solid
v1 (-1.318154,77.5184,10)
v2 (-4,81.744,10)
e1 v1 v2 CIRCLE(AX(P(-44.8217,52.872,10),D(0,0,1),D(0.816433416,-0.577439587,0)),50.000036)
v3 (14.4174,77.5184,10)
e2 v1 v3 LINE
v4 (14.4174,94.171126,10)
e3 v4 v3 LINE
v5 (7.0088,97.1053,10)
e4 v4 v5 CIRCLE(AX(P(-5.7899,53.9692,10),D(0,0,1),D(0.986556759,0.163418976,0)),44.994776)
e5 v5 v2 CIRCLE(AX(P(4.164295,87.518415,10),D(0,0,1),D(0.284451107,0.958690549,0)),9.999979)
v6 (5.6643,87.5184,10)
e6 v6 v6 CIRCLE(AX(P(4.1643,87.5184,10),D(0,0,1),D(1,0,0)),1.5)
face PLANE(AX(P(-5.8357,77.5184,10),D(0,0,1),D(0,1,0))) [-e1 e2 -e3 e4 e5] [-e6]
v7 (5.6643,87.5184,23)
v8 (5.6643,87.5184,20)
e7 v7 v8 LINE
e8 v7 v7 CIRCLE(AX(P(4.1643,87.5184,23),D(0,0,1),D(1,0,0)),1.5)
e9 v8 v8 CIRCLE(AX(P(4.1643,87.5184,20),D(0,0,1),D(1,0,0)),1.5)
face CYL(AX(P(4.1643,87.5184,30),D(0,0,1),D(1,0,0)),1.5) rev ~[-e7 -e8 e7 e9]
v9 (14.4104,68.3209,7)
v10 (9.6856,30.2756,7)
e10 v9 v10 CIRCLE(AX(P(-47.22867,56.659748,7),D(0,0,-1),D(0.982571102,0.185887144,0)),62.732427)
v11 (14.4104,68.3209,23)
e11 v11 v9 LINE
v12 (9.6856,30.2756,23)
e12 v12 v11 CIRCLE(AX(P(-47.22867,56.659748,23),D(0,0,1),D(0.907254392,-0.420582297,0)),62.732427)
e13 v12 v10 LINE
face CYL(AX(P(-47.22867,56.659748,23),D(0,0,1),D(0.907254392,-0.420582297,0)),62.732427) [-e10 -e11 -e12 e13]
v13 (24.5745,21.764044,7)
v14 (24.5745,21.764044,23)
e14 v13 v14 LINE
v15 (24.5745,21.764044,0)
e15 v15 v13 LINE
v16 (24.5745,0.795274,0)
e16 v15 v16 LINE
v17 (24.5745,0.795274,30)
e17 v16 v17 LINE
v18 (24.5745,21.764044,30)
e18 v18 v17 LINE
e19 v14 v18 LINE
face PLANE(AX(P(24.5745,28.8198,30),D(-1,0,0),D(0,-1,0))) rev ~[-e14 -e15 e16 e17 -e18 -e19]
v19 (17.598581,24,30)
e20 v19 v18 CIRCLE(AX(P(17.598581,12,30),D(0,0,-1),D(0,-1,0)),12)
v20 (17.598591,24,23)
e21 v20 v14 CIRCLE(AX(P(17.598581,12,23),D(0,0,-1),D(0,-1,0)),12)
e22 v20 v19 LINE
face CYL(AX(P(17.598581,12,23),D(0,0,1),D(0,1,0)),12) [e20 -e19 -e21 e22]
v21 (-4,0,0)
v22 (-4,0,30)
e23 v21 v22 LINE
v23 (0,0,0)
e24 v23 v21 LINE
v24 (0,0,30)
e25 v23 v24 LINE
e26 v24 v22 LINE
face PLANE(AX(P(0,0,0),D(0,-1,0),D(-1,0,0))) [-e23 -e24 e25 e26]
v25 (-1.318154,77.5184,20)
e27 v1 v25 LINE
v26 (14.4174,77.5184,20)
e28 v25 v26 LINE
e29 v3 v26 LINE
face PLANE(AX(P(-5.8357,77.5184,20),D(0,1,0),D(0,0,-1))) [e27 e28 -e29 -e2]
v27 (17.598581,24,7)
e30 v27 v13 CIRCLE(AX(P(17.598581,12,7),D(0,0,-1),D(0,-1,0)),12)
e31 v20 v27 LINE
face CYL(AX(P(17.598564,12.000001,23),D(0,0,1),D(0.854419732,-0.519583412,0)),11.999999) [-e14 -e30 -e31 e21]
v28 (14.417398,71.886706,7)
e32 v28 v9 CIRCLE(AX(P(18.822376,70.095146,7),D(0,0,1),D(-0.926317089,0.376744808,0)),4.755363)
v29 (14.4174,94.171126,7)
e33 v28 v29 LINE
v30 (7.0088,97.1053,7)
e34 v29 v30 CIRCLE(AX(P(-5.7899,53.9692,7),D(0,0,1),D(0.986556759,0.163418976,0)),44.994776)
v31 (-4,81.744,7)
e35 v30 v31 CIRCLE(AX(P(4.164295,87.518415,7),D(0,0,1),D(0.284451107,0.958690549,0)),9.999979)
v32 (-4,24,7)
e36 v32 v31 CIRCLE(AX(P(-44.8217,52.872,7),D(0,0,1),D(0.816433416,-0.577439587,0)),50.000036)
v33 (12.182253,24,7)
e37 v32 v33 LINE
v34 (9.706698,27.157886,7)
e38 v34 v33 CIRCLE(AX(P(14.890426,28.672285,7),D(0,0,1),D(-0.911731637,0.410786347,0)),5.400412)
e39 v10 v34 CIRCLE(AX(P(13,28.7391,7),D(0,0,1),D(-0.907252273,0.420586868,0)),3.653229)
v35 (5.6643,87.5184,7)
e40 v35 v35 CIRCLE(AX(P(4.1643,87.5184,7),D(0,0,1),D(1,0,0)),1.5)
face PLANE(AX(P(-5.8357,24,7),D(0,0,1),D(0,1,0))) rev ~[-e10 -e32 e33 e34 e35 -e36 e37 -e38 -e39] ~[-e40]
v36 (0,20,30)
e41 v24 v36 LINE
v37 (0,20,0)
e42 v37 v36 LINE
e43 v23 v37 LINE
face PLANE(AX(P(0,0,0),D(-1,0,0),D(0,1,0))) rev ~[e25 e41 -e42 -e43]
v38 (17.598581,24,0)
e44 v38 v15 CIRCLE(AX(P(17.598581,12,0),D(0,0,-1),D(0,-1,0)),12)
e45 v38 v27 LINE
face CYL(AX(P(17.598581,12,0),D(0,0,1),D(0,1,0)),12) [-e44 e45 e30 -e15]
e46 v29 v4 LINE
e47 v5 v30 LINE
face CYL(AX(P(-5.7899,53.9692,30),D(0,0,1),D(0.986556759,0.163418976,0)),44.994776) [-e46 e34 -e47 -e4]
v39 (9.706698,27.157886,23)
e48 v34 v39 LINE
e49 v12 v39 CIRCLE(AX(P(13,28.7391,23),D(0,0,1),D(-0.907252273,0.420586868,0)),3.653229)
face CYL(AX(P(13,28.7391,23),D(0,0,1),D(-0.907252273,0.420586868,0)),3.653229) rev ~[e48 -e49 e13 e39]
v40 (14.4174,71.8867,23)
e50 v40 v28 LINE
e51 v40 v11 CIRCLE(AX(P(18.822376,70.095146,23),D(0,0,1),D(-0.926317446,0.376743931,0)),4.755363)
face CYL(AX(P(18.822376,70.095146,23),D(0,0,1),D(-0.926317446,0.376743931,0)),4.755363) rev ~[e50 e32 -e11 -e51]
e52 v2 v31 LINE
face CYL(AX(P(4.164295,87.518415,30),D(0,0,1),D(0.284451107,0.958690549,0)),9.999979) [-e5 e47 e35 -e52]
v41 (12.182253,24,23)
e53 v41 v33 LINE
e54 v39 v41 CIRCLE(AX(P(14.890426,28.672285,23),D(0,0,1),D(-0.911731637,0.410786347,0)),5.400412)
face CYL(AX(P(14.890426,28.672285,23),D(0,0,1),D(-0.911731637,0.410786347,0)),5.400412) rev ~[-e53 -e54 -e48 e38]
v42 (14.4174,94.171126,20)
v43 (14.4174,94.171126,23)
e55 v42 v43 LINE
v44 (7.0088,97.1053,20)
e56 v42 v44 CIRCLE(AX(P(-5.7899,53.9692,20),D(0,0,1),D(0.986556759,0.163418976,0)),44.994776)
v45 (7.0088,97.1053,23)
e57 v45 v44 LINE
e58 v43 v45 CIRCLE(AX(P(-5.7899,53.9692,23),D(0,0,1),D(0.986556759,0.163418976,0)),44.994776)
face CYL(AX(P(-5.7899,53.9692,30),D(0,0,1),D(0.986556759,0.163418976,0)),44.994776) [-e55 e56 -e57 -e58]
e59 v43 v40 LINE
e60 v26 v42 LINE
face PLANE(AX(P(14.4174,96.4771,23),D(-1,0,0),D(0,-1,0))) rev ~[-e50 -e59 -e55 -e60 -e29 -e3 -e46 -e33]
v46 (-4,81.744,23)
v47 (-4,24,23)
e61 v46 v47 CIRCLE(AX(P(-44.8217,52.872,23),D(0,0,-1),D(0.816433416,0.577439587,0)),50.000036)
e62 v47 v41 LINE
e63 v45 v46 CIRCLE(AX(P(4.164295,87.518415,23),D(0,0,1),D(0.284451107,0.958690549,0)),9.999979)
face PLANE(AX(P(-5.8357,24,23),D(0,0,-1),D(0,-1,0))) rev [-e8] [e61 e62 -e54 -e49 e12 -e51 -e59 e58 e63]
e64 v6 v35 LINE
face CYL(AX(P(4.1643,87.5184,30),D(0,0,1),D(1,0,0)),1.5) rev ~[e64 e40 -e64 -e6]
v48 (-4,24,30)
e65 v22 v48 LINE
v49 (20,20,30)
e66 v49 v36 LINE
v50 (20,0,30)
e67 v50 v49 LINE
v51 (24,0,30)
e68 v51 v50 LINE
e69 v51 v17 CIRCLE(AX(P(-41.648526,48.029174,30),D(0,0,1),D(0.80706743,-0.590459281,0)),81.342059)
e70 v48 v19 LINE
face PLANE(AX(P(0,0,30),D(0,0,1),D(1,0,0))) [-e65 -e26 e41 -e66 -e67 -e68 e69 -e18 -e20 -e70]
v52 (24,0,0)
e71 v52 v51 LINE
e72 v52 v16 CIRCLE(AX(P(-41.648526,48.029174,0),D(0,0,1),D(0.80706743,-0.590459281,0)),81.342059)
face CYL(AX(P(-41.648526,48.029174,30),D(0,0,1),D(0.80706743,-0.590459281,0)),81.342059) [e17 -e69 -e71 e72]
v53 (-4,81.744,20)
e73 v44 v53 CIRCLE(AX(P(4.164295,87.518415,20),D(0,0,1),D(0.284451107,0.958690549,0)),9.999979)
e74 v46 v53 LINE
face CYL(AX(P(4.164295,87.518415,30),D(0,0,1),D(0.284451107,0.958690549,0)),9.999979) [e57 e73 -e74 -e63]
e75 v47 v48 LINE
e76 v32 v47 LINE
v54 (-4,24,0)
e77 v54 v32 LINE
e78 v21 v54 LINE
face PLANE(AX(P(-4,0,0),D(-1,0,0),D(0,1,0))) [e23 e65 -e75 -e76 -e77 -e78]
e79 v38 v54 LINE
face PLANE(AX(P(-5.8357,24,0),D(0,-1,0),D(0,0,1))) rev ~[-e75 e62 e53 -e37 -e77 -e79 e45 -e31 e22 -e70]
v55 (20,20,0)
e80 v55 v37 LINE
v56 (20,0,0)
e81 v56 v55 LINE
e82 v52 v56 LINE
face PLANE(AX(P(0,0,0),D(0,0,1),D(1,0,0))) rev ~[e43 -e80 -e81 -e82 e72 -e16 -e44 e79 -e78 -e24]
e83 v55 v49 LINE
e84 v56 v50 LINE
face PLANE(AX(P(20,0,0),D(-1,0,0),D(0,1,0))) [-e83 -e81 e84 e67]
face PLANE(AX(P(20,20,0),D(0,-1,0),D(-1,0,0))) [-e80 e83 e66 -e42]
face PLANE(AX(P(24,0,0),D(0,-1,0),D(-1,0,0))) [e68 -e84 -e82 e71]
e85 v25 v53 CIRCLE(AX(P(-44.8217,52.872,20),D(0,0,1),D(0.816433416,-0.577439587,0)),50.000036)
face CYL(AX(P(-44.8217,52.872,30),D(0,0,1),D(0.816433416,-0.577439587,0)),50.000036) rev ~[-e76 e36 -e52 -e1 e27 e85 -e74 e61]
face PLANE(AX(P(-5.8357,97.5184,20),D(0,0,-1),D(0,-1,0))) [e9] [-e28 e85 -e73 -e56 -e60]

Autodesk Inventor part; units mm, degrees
ref_plane "YZ Plane" through (0, 0, 0) normal (1, 0, 0) x (0, 1, 0)
sketch "Эскиз1" plane through (0, 0, 0) normal (0, 0, 1) x (1, 0, 0)
  line L0 (0, 0) -> (20, 0) construction
  line L1 (20, 0) -> (20, 20) construction
  line L2 (20, 20) -> (0, 20) construction
  line L3 (0, 20) -> (0, 0) construction
  line L4 (0, 0) -> (0, 20)
  line L5 (0, 0) -> (-4, 0)
  line L6 (-4, 0) -> (-4, 24)
  line L7 (-4, 24) -> (24, 24)
  line L8 (24, 24) -> (24, 0)
  line L9 (24, 0) -> (20, 0)
  line L10 (20, 0) -> (20, 20)
  line L11 (20, 20) -> (0, 20)
  dimension "d0" = 20
  dimension "d1" = 4
  dimension "d2" = 4
extrude "Выдавливание1" add sketch "Эскиз1" along normal blind 30
sketch "Эскиз2" plane through (0, 0, 30) normal (0, 0, 1) x (1, 0, 0)
  line L0 (24, 0) -> (24, 24) projected
  arc A0 (24, 0) -> (38.6, 61.3222) centre (-41.6488, 48.0293) ccw
  arc A1 (38.6, 61.3222) -> (7.0088, 97.1053) centre (-5.7899, 53.9692) ccw
  line L1 (-4, 24) -> (-4, 0) projected
  arc A2 (-4, 24) -> (-4, 81.744) centre (-44.8217, 52.872) ccw
  arc A3 (7.0088, 97.1053) -> (-4, 81.744) centre (4.1643, 87.5184) ccw
  circle A4 centre (4.1643, 87.5184) radius 1.5
  line L2 (24, 24) -> (-4, 24) projected
  point P0 (0, 0)
  dimension "d5" = 10
  dimension "d6" = 3
  dimension "d7" = 50
extrude "Выдавливание2" add sketch "Эскиз2" against normal up to surface (30 mm away)
ref_plane "РабПлоскость1" through (-5.8357, 87.5184, 30) normal (-1, 0, 0) x (0, 0, 1)
sketch "Эскиз4" plane through (-5.8357, 87.5184, 30) normal (-1, 0, 0) x (0, 0, 1)
  line L0 (-20, 10) -> (-10, 10)
  line L1 (-10, 10) -> (-10, -10)
  line L2 (-10, -10) -> (-20, -10)
  line L3 (-20, -10) -> (-20, 10)
  line L4 (0, 10) -> (-30, 10) projected
  point P0 (-30, -87.5184)
  point P1 (-15, 10)
  dimension "d10" = 10
  dimension "d11" = 20
extrude "Выдавливание3" cut sketch "Эскиз4" against normal through all
sketch "Эскиз5" plane through (-5.8357, 87.5184, 30) normal (-1, 0, 0) x (0, 0, 1)
  line L0 (-30, -26.1962) -> (-30, -87.5184) projected
  line L1 (-30, -63.5184) -> (-23, -63.5184)
  line L2 (-23, -63.5184) -> (-23, -16.5184)
  line L3 (-23, -16.5184) -> (-30, -16.5184)
  line L4 (-30, -16.5184) -> (-30, -63.5184)
  line L5 (-30, -63.5184) -> (0, -63.5184) projected
  dimension "d14" = 7
  dimension "d15" = 47
extrude "Выдавливание4" cut sketch "Эскиз5" against normal through all
ref_plane "РабПлоскость2" through (0, 0, 15) normal (0, 0, -1) x (-1, 0, 0)
mirror "Зеркальное отражение1" about plane through (0, 0, 15) normal (0, 0, -1) of "Выдавливание4"
fillet "Сопряжение1" radius 12 2 edges at (36.0633, 24, 3.5) (36.0633, 24, 26.5)
fillet "Сопряжение2" radius 12 2 edges at (35.8572, 71, 3.5) (35.8572, 71, 26.5)
sketch "Эскиз6" plane through (-4, 24, 23) normal (0, 0, 1) x (1, 0, 0)
  arc A0 (17, 4.7391) -> (22, 45) centre (-43.2292, 32.6599) ccw construction
  arc A1 (20.3144, 3.2026) -> (25.5896, 45.6791) centre (-43.2292, 32.6599) ccw
  arc A2 (13.6856, 6.2756) -> (18.4104, 44.3209) centre (-43.2292, 32.6599) ccw
  arc A3 (13.6856, 6.2756) -> (20.3144, 3.2026) centre (17, 4.7391) ccw
  arc A4 (25.5896, 45.6791) -> (18.4104, 44.3209) centre (22, 45) ccw
  line L0 (0, 0) -> (0, -24) projected
  point P0 (4, -24)
  dimension "d20" = 17
  dimension "d21" = 45
  dimension "d22" = 22
extrude "Выдавливание5" cut sketch "Эскиз6" against normal through all
sketch "Эскиз7" plane through (-4, 24, 23) normal (0, 0, 1) x (1, 0, 0)
  arc A0 (31.8516, -18.235) -> (42.6, 37.3222) centre (-37.6488, 24.0293) ccw projected
  arc A1 (31.8516, -18.235) -> (21.5986, 0) centre (21.5986, -12) ccw projected
  arc A2 (42.6, 37.3222) -> (19.593, 69.5583) centre (-1.7899, 29.9692) ccw projected
  arc A3 (13.8903, 47) -> (19.593, 69.5583) centre (13.8903, 59) ccw projected
  arc A4 (13.6856, 6.2756) -> (18.4104, 44.3209) centre (-43.2292, 32.6599) ccw projected
  arc A5 (13.8903, 47) -> (19.593, 69.5583) centre (13.8903, 59) ccw projected
  arc A6 (18.4174, 47.8867) -> (19.593, 69.5583) centre (13.9238, 58.9982) ccw
  line L0 (0, 0) -> (21.5986, 0) projected
  arc A7 (13.9667, 6.8907) -> (21.5986, 0) centre (18.8905, 4.6723) ccw
  arc A8 (18.4174, 47.8867) -> (18.4104, 44.3209) centre (22.8221, 46.0952) ccw
  point P0 (4, -24)
  point P1 (19.6658, 69.519)
  point P2 (16.1824, 0)
extrude "Выдавливание6" cut sketch "Эскиз7" against normal blind 36 contours A1 L0 A7 A4 A8 A6 A2 A0
sketch "Эскиз8" plane through (-4, 0, 0) normal (-1, 0, 0) x (0, 0, 1)
  point P0 (0, 0)
sketch "Эскиз9" plane through (-5.8357, 87.5184, 30) normal (-1, 0, 0) x (0, 0, 1)
  line L0 (-23, -16.5184) -> (-23, -63.5184) projected
  line L1 (-23, -16.5184) -> (-46.8016, -16.5184)
  line L2 (-46.8016, -16.5184) -> (-46.8016, 17.3569)
  line L3 (-46.8016, 17.3569) -> (-23, 17.3569)
  line L4 (-23, 17.3569) -> (-23, -16.5184)
  point P0 (-30, -87.5184)
extrude "Выдавливание7" cut sketch "Эскиз9" against normal blind 36
mirror "Зеркальное отражение2" about plane through (0, 0, 15) normal (0, 0, -1) of "Выдавливание7"
sketch "Эскиз10" plane through (0, 0, 30) normal (0, 0, 1) x (1, 0, 0)
  line L0 (24.5745, 0) -> (35.4567, 0)
  line L1 (35.4567, 0) -> (35.4567, 28.8198)
  line L2 (35.4567, 28.8198) -> (24.5745, 28.8198)
  line L3 (24.5745, 28.8198) -> (24.5745, 0)
  point P0 (0, 0)
extrude "Выдавливание8" cut sketch "Эскиз10" against normal through all
sketch "Эскиз11" plane through (-44.8217, 52.872, 23) normal (0, 0, 1) x (1, 0, 0)
  arc A0 (59.2391, 19.0147) -> (60.4874, 40.647) centre (54.7454, 30.1262) ccw projected
  line L0 (59.2391, 19.0147) -> (70.8374, 19.0147)
  line L1 (70.8374, 19.0147) -> (70.8374, 43.6051)
  line L2 (70.8374, 43.6051) -> (59.2391, 43.6051)
  line L3 (59.2391, 43.6051) -> (59.2391, 19.0147)
  point P0 (44.8217, -52.872)
extrude "Выдавливание9" cut sketch "Эскиз11" against normal through all
properties part number "shok_absorber_holder"
